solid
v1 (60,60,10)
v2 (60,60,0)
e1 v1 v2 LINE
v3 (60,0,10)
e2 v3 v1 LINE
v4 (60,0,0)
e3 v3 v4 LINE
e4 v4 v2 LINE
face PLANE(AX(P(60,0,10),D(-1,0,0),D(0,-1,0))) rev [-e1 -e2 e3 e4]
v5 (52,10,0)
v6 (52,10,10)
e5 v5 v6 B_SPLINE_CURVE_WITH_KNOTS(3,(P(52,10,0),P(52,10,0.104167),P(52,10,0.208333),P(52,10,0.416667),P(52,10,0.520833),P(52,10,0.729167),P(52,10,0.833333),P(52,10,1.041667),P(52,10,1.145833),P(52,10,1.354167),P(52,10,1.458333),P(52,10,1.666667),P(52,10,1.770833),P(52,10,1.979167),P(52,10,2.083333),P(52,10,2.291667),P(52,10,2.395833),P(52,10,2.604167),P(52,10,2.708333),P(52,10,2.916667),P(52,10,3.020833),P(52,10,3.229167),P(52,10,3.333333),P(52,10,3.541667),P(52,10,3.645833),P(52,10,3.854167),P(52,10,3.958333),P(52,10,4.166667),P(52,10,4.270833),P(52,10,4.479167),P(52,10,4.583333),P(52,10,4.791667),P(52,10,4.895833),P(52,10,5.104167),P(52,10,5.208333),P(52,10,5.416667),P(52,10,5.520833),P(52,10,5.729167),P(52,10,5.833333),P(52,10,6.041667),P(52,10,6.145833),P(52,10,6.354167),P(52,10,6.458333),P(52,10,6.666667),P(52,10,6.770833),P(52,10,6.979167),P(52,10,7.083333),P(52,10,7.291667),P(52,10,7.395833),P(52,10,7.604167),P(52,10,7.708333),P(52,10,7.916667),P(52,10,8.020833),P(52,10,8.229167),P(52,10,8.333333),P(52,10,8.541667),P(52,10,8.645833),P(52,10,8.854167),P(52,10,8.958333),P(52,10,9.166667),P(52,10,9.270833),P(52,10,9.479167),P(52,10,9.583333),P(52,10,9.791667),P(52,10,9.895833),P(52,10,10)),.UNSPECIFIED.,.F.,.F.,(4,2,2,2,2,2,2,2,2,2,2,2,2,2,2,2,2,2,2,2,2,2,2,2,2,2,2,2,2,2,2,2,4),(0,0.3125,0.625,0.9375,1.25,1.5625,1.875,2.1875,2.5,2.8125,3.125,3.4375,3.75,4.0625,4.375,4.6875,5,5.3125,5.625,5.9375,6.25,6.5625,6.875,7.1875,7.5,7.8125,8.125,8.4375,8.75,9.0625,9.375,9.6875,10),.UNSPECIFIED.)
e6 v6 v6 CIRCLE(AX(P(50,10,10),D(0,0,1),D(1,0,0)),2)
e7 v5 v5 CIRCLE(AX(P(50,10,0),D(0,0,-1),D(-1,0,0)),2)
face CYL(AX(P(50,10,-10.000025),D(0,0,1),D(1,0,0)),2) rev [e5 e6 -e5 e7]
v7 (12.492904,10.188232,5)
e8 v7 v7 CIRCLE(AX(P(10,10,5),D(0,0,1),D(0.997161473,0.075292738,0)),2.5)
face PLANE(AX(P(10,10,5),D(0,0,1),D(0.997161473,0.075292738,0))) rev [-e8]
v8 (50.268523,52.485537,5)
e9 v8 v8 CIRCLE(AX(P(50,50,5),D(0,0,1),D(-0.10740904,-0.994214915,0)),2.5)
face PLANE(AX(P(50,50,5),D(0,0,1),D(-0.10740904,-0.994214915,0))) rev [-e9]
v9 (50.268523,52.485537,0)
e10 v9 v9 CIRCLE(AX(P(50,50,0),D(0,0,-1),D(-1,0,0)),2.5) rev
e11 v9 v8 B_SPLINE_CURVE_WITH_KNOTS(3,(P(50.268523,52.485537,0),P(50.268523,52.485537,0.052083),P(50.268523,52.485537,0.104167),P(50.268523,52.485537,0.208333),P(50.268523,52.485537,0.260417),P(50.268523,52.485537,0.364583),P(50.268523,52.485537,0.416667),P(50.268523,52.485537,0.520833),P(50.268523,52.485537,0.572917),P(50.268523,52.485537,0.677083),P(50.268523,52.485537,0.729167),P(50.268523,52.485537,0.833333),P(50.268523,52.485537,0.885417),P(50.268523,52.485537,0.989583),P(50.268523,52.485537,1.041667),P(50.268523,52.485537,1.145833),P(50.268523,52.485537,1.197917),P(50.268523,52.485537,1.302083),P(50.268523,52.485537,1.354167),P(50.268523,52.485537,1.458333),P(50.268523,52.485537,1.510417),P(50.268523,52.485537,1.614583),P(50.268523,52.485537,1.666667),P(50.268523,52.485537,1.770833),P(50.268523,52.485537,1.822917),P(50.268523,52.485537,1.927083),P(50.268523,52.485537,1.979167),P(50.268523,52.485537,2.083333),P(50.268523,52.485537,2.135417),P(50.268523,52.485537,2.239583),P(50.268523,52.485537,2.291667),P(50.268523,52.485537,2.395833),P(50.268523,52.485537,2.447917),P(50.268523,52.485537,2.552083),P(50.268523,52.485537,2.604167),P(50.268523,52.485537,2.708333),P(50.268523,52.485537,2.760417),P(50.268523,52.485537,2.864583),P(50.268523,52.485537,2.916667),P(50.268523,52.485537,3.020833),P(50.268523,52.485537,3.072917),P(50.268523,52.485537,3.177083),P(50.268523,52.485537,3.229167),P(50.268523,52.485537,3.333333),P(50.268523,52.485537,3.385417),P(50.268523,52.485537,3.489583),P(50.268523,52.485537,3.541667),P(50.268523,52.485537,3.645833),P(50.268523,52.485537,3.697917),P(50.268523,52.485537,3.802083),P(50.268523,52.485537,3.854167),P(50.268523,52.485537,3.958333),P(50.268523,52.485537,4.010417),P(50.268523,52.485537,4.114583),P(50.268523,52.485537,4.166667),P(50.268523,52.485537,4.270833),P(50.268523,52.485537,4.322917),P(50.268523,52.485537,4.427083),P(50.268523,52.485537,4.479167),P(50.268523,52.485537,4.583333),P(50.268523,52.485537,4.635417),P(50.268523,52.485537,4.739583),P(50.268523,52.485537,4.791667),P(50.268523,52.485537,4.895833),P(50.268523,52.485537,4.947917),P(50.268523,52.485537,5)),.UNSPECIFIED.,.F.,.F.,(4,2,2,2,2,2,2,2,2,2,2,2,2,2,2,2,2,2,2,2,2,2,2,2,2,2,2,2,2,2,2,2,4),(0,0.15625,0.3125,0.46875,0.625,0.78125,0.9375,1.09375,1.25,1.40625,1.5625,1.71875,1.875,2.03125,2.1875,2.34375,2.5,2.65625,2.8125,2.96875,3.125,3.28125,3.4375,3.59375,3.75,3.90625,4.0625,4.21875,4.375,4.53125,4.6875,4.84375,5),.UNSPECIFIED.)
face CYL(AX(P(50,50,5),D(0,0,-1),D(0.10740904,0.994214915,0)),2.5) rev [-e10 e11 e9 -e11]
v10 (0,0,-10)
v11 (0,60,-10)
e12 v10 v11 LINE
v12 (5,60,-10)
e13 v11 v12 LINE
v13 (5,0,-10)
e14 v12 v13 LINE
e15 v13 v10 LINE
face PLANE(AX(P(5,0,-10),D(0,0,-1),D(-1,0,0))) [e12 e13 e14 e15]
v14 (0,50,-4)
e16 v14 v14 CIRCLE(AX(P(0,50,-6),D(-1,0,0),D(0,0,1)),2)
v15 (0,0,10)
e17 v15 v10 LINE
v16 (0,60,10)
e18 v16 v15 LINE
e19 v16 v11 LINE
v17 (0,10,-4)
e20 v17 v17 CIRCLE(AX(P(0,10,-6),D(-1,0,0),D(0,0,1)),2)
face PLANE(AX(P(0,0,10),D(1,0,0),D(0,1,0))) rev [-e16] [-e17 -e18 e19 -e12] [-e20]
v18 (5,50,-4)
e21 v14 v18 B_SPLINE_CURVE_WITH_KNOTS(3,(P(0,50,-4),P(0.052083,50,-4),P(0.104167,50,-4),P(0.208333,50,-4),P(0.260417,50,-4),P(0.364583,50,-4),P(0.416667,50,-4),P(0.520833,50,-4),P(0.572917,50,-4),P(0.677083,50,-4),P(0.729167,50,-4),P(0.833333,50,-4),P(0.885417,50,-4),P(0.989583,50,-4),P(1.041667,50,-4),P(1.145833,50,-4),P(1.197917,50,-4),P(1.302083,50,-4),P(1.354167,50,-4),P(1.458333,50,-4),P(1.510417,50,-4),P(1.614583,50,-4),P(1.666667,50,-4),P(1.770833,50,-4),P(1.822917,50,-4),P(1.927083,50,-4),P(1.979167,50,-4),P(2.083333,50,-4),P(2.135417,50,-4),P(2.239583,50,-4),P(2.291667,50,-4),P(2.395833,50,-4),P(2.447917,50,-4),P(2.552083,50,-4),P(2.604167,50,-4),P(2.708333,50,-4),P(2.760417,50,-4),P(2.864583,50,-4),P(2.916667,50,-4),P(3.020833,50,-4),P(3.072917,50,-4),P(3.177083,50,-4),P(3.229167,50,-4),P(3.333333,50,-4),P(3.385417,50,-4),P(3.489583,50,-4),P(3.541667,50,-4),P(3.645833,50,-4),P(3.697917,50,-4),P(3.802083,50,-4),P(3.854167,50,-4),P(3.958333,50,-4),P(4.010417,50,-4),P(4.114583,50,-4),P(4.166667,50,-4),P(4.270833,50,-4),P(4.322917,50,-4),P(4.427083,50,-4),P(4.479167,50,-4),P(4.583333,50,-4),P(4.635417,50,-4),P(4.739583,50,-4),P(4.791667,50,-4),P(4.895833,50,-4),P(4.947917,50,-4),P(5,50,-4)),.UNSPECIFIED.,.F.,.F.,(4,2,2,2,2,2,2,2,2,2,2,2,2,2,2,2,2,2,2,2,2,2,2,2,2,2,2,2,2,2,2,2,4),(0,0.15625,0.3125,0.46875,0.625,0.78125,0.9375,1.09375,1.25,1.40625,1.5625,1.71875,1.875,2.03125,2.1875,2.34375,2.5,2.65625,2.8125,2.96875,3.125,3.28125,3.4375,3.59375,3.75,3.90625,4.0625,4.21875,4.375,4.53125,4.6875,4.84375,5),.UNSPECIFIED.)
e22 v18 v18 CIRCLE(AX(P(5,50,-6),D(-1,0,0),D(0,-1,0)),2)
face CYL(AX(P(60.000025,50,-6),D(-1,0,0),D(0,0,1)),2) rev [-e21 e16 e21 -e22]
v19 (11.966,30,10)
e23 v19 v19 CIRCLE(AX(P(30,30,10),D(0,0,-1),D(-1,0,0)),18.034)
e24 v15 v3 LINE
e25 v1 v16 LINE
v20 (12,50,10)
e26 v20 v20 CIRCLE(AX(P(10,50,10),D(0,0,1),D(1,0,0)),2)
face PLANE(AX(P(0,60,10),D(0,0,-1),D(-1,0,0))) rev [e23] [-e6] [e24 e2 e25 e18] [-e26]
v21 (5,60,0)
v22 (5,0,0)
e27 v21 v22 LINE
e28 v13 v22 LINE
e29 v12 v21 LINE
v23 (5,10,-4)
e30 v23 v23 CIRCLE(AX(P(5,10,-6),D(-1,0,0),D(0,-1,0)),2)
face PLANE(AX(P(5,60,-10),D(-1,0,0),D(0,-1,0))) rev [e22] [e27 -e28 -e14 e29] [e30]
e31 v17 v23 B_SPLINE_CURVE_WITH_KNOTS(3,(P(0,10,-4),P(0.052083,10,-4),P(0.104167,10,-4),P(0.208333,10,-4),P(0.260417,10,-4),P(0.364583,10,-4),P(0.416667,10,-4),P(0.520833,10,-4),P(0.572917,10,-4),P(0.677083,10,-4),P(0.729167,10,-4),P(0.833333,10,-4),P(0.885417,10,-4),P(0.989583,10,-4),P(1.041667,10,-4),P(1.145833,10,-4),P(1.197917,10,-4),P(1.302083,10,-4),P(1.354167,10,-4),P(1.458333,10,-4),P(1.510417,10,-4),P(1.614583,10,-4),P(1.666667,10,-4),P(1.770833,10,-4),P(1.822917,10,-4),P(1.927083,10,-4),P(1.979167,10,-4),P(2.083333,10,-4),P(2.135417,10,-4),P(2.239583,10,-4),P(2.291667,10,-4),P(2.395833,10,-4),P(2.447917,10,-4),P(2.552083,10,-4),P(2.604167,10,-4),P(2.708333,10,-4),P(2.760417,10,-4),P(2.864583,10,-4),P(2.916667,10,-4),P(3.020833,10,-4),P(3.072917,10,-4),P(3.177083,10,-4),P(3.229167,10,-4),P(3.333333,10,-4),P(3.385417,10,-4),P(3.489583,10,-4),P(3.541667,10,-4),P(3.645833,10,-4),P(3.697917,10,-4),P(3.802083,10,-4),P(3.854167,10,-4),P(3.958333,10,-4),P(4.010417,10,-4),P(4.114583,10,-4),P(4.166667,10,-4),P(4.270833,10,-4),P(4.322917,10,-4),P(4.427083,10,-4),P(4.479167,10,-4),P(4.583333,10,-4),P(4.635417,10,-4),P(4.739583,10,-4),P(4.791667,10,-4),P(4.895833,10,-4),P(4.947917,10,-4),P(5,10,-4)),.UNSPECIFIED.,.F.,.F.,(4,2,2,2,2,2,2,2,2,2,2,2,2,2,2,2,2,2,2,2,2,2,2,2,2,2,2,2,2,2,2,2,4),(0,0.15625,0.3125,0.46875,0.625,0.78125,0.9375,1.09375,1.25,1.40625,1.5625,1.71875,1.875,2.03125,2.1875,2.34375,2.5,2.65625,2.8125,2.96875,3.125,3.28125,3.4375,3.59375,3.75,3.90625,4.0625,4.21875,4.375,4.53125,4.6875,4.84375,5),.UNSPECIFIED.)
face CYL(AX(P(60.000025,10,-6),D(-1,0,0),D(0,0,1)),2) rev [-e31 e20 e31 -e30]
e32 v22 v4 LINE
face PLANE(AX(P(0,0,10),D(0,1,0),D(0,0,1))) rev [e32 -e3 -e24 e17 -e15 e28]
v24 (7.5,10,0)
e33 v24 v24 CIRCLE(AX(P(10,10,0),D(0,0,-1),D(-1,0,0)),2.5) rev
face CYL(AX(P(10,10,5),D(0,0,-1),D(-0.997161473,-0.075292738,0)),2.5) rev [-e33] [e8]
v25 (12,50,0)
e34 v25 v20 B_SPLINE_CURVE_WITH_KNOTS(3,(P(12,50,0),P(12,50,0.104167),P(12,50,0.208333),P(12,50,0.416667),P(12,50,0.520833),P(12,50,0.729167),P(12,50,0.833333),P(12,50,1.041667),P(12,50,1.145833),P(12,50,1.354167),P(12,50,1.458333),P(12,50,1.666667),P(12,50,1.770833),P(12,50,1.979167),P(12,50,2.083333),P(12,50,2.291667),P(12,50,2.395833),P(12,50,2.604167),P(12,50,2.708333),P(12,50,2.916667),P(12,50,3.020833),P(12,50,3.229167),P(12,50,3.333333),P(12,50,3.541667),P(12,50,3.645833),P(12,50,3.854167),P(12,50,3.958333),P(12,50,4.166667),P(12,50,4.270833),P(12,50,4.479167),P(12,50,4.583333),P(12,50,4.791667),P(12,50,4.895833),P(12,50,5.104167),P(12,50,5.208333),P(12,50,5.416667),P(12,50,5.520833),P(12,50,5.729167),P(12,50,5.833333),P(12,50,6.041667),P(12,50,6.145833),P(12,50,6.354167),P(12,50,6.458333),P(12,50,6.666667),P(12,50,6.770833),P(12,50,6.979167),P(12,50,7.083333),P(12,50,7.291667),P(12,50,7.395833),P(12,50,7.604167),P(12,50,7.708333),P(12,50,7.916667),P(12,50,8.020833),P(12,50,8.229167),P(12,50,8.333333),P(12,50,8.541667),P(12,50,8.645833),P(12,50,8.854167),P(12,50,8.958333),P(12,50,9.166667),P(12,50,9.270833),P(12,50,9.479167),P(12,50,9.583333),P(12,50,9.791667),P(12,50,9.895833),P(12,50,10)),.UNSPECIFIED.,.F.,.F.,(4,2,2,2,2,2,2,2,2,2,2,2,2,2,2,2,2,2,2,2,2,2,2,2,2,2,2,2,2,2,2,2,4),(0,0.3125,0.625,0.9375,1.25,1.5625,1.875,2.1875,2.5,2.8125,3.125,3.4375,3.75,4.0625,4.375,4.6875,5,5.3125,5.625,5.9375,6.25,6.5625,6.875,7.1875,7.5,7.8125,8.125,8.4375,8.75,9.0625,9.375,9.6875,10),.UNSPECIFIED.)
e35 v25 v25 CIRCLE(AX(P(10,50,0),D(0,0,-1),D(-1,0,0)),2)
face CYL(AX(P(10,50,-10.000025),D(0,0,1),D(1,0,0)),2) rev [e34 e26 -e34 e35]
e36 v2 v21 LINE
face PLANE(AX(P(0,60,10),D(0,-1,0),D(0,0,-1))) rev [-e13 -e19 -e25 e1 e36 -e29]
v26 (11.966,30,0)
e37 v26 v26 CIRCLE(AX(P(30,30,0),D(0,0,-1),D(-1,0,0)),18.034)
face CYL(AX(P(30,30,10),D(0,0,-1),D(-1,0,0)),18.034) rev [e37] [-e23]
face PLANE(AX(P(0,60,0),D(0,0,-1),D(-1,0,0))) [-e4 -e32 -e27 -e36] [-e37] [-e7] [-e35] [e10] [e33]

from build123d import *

# Parameters (mm, degrees)
SKETCH1_W           = 60
SKETCH1_H           = 60
BOSS_EXTRUDE1_DEPTH = 10
SKETCH2_R           = 18.034
CUT_EXTRUDE1_DEPTH  = 86.440037453
SKETCH4_W           = 5
SKETCH4_H           = 60
BOSS_EXTRUDE2_DEPTH = 10
SKETCH5_R           = 2
CUT_EXTRUDE3_DEPTH  = 86.440037453
CAVITY3_OUTLINE_R   = 2.5
CAVITY3_DEPTH       = 5
SKETCH7_R           = 2
CUT_EXTRUDE4_DEPTH  = 88.177978871


# Read off the part's stored shape, not the designer's step: Cavity3
with BuildPart() as part:
    # Sketch1 → Boss-Extrude1 (new body)
    with BuildSketch(Plane.XY):
        with Locations((30, 30)):
            Rectangle(SKETCH1_W, SKETCH1_H)
    extrude(amount=BOSS_EXTRUDE1_DEPTH)

    # Sketch2 → Cut-Extrude1 (cut, through all)
    with BuildSketch(Plane(origin=(0, 0, 0), x_dir=(-1, 0, 0), z_dir=(0, 0, -1))):
        with Locations((-30, 30)):
            Circle(SKETCH2_R)
    extrude(amount=-CUT_EXTRUDE1_DEPTH, mode=Mode.SUBTRACT)

    # Sketch4 → Boss-Extrude2 (add)
    with BuildSketch(Plane(origin=(0, 0, 0), x_dir=(-1, 0, 0), z_dir=(0, 0, -1))):
        with Locations((-2.5, 30)):
            Rectangle(SKETCH4_W, SKETCH4_H)
    extrude(amount=BOSS_EXTRUDE2_DEPTH)

    # Sketch5 → Cut-Extrude3 (cut, through all)
    with BuildSketch(Plane.ZY):
        with Locations((-6, 50)):
            Circle(SKETCH5_R)
        with Locations((-6, 10)):
            Circle(SKETCH5_R)
    extrude(amount=-CUT_EXTRUDE3_DEPTH, mode=Mode.SUBTRACT)

    # Cavity3 outline → Cavity3 (cut)
    with BuildSketch(Plane.XY):
        with Locations((10, 10)):
            Circle(CAVITY3_OUTLINE_R)
        with Locations((50, 50)):
            Circle(CAVITY3_OUTLINE_R)
    extrude(amount=CAVITY3_DEPTH, mode=Mode.SUBTRACT)

    # Sketch7 → Cut-Extrude4 (cut, through all)
    with BuildSketch(Plane.XY.offset(10)):
        with Locations((10, 50)):
            Circle(SKETCH7_R)
        with Locations((50, 10)):
            Circle(SKETCH7_R)
    extrude(amount=-CUT_EXTRUDE4_DEPTH, mode=Mode.SUBTRACT)


solid = part.part
